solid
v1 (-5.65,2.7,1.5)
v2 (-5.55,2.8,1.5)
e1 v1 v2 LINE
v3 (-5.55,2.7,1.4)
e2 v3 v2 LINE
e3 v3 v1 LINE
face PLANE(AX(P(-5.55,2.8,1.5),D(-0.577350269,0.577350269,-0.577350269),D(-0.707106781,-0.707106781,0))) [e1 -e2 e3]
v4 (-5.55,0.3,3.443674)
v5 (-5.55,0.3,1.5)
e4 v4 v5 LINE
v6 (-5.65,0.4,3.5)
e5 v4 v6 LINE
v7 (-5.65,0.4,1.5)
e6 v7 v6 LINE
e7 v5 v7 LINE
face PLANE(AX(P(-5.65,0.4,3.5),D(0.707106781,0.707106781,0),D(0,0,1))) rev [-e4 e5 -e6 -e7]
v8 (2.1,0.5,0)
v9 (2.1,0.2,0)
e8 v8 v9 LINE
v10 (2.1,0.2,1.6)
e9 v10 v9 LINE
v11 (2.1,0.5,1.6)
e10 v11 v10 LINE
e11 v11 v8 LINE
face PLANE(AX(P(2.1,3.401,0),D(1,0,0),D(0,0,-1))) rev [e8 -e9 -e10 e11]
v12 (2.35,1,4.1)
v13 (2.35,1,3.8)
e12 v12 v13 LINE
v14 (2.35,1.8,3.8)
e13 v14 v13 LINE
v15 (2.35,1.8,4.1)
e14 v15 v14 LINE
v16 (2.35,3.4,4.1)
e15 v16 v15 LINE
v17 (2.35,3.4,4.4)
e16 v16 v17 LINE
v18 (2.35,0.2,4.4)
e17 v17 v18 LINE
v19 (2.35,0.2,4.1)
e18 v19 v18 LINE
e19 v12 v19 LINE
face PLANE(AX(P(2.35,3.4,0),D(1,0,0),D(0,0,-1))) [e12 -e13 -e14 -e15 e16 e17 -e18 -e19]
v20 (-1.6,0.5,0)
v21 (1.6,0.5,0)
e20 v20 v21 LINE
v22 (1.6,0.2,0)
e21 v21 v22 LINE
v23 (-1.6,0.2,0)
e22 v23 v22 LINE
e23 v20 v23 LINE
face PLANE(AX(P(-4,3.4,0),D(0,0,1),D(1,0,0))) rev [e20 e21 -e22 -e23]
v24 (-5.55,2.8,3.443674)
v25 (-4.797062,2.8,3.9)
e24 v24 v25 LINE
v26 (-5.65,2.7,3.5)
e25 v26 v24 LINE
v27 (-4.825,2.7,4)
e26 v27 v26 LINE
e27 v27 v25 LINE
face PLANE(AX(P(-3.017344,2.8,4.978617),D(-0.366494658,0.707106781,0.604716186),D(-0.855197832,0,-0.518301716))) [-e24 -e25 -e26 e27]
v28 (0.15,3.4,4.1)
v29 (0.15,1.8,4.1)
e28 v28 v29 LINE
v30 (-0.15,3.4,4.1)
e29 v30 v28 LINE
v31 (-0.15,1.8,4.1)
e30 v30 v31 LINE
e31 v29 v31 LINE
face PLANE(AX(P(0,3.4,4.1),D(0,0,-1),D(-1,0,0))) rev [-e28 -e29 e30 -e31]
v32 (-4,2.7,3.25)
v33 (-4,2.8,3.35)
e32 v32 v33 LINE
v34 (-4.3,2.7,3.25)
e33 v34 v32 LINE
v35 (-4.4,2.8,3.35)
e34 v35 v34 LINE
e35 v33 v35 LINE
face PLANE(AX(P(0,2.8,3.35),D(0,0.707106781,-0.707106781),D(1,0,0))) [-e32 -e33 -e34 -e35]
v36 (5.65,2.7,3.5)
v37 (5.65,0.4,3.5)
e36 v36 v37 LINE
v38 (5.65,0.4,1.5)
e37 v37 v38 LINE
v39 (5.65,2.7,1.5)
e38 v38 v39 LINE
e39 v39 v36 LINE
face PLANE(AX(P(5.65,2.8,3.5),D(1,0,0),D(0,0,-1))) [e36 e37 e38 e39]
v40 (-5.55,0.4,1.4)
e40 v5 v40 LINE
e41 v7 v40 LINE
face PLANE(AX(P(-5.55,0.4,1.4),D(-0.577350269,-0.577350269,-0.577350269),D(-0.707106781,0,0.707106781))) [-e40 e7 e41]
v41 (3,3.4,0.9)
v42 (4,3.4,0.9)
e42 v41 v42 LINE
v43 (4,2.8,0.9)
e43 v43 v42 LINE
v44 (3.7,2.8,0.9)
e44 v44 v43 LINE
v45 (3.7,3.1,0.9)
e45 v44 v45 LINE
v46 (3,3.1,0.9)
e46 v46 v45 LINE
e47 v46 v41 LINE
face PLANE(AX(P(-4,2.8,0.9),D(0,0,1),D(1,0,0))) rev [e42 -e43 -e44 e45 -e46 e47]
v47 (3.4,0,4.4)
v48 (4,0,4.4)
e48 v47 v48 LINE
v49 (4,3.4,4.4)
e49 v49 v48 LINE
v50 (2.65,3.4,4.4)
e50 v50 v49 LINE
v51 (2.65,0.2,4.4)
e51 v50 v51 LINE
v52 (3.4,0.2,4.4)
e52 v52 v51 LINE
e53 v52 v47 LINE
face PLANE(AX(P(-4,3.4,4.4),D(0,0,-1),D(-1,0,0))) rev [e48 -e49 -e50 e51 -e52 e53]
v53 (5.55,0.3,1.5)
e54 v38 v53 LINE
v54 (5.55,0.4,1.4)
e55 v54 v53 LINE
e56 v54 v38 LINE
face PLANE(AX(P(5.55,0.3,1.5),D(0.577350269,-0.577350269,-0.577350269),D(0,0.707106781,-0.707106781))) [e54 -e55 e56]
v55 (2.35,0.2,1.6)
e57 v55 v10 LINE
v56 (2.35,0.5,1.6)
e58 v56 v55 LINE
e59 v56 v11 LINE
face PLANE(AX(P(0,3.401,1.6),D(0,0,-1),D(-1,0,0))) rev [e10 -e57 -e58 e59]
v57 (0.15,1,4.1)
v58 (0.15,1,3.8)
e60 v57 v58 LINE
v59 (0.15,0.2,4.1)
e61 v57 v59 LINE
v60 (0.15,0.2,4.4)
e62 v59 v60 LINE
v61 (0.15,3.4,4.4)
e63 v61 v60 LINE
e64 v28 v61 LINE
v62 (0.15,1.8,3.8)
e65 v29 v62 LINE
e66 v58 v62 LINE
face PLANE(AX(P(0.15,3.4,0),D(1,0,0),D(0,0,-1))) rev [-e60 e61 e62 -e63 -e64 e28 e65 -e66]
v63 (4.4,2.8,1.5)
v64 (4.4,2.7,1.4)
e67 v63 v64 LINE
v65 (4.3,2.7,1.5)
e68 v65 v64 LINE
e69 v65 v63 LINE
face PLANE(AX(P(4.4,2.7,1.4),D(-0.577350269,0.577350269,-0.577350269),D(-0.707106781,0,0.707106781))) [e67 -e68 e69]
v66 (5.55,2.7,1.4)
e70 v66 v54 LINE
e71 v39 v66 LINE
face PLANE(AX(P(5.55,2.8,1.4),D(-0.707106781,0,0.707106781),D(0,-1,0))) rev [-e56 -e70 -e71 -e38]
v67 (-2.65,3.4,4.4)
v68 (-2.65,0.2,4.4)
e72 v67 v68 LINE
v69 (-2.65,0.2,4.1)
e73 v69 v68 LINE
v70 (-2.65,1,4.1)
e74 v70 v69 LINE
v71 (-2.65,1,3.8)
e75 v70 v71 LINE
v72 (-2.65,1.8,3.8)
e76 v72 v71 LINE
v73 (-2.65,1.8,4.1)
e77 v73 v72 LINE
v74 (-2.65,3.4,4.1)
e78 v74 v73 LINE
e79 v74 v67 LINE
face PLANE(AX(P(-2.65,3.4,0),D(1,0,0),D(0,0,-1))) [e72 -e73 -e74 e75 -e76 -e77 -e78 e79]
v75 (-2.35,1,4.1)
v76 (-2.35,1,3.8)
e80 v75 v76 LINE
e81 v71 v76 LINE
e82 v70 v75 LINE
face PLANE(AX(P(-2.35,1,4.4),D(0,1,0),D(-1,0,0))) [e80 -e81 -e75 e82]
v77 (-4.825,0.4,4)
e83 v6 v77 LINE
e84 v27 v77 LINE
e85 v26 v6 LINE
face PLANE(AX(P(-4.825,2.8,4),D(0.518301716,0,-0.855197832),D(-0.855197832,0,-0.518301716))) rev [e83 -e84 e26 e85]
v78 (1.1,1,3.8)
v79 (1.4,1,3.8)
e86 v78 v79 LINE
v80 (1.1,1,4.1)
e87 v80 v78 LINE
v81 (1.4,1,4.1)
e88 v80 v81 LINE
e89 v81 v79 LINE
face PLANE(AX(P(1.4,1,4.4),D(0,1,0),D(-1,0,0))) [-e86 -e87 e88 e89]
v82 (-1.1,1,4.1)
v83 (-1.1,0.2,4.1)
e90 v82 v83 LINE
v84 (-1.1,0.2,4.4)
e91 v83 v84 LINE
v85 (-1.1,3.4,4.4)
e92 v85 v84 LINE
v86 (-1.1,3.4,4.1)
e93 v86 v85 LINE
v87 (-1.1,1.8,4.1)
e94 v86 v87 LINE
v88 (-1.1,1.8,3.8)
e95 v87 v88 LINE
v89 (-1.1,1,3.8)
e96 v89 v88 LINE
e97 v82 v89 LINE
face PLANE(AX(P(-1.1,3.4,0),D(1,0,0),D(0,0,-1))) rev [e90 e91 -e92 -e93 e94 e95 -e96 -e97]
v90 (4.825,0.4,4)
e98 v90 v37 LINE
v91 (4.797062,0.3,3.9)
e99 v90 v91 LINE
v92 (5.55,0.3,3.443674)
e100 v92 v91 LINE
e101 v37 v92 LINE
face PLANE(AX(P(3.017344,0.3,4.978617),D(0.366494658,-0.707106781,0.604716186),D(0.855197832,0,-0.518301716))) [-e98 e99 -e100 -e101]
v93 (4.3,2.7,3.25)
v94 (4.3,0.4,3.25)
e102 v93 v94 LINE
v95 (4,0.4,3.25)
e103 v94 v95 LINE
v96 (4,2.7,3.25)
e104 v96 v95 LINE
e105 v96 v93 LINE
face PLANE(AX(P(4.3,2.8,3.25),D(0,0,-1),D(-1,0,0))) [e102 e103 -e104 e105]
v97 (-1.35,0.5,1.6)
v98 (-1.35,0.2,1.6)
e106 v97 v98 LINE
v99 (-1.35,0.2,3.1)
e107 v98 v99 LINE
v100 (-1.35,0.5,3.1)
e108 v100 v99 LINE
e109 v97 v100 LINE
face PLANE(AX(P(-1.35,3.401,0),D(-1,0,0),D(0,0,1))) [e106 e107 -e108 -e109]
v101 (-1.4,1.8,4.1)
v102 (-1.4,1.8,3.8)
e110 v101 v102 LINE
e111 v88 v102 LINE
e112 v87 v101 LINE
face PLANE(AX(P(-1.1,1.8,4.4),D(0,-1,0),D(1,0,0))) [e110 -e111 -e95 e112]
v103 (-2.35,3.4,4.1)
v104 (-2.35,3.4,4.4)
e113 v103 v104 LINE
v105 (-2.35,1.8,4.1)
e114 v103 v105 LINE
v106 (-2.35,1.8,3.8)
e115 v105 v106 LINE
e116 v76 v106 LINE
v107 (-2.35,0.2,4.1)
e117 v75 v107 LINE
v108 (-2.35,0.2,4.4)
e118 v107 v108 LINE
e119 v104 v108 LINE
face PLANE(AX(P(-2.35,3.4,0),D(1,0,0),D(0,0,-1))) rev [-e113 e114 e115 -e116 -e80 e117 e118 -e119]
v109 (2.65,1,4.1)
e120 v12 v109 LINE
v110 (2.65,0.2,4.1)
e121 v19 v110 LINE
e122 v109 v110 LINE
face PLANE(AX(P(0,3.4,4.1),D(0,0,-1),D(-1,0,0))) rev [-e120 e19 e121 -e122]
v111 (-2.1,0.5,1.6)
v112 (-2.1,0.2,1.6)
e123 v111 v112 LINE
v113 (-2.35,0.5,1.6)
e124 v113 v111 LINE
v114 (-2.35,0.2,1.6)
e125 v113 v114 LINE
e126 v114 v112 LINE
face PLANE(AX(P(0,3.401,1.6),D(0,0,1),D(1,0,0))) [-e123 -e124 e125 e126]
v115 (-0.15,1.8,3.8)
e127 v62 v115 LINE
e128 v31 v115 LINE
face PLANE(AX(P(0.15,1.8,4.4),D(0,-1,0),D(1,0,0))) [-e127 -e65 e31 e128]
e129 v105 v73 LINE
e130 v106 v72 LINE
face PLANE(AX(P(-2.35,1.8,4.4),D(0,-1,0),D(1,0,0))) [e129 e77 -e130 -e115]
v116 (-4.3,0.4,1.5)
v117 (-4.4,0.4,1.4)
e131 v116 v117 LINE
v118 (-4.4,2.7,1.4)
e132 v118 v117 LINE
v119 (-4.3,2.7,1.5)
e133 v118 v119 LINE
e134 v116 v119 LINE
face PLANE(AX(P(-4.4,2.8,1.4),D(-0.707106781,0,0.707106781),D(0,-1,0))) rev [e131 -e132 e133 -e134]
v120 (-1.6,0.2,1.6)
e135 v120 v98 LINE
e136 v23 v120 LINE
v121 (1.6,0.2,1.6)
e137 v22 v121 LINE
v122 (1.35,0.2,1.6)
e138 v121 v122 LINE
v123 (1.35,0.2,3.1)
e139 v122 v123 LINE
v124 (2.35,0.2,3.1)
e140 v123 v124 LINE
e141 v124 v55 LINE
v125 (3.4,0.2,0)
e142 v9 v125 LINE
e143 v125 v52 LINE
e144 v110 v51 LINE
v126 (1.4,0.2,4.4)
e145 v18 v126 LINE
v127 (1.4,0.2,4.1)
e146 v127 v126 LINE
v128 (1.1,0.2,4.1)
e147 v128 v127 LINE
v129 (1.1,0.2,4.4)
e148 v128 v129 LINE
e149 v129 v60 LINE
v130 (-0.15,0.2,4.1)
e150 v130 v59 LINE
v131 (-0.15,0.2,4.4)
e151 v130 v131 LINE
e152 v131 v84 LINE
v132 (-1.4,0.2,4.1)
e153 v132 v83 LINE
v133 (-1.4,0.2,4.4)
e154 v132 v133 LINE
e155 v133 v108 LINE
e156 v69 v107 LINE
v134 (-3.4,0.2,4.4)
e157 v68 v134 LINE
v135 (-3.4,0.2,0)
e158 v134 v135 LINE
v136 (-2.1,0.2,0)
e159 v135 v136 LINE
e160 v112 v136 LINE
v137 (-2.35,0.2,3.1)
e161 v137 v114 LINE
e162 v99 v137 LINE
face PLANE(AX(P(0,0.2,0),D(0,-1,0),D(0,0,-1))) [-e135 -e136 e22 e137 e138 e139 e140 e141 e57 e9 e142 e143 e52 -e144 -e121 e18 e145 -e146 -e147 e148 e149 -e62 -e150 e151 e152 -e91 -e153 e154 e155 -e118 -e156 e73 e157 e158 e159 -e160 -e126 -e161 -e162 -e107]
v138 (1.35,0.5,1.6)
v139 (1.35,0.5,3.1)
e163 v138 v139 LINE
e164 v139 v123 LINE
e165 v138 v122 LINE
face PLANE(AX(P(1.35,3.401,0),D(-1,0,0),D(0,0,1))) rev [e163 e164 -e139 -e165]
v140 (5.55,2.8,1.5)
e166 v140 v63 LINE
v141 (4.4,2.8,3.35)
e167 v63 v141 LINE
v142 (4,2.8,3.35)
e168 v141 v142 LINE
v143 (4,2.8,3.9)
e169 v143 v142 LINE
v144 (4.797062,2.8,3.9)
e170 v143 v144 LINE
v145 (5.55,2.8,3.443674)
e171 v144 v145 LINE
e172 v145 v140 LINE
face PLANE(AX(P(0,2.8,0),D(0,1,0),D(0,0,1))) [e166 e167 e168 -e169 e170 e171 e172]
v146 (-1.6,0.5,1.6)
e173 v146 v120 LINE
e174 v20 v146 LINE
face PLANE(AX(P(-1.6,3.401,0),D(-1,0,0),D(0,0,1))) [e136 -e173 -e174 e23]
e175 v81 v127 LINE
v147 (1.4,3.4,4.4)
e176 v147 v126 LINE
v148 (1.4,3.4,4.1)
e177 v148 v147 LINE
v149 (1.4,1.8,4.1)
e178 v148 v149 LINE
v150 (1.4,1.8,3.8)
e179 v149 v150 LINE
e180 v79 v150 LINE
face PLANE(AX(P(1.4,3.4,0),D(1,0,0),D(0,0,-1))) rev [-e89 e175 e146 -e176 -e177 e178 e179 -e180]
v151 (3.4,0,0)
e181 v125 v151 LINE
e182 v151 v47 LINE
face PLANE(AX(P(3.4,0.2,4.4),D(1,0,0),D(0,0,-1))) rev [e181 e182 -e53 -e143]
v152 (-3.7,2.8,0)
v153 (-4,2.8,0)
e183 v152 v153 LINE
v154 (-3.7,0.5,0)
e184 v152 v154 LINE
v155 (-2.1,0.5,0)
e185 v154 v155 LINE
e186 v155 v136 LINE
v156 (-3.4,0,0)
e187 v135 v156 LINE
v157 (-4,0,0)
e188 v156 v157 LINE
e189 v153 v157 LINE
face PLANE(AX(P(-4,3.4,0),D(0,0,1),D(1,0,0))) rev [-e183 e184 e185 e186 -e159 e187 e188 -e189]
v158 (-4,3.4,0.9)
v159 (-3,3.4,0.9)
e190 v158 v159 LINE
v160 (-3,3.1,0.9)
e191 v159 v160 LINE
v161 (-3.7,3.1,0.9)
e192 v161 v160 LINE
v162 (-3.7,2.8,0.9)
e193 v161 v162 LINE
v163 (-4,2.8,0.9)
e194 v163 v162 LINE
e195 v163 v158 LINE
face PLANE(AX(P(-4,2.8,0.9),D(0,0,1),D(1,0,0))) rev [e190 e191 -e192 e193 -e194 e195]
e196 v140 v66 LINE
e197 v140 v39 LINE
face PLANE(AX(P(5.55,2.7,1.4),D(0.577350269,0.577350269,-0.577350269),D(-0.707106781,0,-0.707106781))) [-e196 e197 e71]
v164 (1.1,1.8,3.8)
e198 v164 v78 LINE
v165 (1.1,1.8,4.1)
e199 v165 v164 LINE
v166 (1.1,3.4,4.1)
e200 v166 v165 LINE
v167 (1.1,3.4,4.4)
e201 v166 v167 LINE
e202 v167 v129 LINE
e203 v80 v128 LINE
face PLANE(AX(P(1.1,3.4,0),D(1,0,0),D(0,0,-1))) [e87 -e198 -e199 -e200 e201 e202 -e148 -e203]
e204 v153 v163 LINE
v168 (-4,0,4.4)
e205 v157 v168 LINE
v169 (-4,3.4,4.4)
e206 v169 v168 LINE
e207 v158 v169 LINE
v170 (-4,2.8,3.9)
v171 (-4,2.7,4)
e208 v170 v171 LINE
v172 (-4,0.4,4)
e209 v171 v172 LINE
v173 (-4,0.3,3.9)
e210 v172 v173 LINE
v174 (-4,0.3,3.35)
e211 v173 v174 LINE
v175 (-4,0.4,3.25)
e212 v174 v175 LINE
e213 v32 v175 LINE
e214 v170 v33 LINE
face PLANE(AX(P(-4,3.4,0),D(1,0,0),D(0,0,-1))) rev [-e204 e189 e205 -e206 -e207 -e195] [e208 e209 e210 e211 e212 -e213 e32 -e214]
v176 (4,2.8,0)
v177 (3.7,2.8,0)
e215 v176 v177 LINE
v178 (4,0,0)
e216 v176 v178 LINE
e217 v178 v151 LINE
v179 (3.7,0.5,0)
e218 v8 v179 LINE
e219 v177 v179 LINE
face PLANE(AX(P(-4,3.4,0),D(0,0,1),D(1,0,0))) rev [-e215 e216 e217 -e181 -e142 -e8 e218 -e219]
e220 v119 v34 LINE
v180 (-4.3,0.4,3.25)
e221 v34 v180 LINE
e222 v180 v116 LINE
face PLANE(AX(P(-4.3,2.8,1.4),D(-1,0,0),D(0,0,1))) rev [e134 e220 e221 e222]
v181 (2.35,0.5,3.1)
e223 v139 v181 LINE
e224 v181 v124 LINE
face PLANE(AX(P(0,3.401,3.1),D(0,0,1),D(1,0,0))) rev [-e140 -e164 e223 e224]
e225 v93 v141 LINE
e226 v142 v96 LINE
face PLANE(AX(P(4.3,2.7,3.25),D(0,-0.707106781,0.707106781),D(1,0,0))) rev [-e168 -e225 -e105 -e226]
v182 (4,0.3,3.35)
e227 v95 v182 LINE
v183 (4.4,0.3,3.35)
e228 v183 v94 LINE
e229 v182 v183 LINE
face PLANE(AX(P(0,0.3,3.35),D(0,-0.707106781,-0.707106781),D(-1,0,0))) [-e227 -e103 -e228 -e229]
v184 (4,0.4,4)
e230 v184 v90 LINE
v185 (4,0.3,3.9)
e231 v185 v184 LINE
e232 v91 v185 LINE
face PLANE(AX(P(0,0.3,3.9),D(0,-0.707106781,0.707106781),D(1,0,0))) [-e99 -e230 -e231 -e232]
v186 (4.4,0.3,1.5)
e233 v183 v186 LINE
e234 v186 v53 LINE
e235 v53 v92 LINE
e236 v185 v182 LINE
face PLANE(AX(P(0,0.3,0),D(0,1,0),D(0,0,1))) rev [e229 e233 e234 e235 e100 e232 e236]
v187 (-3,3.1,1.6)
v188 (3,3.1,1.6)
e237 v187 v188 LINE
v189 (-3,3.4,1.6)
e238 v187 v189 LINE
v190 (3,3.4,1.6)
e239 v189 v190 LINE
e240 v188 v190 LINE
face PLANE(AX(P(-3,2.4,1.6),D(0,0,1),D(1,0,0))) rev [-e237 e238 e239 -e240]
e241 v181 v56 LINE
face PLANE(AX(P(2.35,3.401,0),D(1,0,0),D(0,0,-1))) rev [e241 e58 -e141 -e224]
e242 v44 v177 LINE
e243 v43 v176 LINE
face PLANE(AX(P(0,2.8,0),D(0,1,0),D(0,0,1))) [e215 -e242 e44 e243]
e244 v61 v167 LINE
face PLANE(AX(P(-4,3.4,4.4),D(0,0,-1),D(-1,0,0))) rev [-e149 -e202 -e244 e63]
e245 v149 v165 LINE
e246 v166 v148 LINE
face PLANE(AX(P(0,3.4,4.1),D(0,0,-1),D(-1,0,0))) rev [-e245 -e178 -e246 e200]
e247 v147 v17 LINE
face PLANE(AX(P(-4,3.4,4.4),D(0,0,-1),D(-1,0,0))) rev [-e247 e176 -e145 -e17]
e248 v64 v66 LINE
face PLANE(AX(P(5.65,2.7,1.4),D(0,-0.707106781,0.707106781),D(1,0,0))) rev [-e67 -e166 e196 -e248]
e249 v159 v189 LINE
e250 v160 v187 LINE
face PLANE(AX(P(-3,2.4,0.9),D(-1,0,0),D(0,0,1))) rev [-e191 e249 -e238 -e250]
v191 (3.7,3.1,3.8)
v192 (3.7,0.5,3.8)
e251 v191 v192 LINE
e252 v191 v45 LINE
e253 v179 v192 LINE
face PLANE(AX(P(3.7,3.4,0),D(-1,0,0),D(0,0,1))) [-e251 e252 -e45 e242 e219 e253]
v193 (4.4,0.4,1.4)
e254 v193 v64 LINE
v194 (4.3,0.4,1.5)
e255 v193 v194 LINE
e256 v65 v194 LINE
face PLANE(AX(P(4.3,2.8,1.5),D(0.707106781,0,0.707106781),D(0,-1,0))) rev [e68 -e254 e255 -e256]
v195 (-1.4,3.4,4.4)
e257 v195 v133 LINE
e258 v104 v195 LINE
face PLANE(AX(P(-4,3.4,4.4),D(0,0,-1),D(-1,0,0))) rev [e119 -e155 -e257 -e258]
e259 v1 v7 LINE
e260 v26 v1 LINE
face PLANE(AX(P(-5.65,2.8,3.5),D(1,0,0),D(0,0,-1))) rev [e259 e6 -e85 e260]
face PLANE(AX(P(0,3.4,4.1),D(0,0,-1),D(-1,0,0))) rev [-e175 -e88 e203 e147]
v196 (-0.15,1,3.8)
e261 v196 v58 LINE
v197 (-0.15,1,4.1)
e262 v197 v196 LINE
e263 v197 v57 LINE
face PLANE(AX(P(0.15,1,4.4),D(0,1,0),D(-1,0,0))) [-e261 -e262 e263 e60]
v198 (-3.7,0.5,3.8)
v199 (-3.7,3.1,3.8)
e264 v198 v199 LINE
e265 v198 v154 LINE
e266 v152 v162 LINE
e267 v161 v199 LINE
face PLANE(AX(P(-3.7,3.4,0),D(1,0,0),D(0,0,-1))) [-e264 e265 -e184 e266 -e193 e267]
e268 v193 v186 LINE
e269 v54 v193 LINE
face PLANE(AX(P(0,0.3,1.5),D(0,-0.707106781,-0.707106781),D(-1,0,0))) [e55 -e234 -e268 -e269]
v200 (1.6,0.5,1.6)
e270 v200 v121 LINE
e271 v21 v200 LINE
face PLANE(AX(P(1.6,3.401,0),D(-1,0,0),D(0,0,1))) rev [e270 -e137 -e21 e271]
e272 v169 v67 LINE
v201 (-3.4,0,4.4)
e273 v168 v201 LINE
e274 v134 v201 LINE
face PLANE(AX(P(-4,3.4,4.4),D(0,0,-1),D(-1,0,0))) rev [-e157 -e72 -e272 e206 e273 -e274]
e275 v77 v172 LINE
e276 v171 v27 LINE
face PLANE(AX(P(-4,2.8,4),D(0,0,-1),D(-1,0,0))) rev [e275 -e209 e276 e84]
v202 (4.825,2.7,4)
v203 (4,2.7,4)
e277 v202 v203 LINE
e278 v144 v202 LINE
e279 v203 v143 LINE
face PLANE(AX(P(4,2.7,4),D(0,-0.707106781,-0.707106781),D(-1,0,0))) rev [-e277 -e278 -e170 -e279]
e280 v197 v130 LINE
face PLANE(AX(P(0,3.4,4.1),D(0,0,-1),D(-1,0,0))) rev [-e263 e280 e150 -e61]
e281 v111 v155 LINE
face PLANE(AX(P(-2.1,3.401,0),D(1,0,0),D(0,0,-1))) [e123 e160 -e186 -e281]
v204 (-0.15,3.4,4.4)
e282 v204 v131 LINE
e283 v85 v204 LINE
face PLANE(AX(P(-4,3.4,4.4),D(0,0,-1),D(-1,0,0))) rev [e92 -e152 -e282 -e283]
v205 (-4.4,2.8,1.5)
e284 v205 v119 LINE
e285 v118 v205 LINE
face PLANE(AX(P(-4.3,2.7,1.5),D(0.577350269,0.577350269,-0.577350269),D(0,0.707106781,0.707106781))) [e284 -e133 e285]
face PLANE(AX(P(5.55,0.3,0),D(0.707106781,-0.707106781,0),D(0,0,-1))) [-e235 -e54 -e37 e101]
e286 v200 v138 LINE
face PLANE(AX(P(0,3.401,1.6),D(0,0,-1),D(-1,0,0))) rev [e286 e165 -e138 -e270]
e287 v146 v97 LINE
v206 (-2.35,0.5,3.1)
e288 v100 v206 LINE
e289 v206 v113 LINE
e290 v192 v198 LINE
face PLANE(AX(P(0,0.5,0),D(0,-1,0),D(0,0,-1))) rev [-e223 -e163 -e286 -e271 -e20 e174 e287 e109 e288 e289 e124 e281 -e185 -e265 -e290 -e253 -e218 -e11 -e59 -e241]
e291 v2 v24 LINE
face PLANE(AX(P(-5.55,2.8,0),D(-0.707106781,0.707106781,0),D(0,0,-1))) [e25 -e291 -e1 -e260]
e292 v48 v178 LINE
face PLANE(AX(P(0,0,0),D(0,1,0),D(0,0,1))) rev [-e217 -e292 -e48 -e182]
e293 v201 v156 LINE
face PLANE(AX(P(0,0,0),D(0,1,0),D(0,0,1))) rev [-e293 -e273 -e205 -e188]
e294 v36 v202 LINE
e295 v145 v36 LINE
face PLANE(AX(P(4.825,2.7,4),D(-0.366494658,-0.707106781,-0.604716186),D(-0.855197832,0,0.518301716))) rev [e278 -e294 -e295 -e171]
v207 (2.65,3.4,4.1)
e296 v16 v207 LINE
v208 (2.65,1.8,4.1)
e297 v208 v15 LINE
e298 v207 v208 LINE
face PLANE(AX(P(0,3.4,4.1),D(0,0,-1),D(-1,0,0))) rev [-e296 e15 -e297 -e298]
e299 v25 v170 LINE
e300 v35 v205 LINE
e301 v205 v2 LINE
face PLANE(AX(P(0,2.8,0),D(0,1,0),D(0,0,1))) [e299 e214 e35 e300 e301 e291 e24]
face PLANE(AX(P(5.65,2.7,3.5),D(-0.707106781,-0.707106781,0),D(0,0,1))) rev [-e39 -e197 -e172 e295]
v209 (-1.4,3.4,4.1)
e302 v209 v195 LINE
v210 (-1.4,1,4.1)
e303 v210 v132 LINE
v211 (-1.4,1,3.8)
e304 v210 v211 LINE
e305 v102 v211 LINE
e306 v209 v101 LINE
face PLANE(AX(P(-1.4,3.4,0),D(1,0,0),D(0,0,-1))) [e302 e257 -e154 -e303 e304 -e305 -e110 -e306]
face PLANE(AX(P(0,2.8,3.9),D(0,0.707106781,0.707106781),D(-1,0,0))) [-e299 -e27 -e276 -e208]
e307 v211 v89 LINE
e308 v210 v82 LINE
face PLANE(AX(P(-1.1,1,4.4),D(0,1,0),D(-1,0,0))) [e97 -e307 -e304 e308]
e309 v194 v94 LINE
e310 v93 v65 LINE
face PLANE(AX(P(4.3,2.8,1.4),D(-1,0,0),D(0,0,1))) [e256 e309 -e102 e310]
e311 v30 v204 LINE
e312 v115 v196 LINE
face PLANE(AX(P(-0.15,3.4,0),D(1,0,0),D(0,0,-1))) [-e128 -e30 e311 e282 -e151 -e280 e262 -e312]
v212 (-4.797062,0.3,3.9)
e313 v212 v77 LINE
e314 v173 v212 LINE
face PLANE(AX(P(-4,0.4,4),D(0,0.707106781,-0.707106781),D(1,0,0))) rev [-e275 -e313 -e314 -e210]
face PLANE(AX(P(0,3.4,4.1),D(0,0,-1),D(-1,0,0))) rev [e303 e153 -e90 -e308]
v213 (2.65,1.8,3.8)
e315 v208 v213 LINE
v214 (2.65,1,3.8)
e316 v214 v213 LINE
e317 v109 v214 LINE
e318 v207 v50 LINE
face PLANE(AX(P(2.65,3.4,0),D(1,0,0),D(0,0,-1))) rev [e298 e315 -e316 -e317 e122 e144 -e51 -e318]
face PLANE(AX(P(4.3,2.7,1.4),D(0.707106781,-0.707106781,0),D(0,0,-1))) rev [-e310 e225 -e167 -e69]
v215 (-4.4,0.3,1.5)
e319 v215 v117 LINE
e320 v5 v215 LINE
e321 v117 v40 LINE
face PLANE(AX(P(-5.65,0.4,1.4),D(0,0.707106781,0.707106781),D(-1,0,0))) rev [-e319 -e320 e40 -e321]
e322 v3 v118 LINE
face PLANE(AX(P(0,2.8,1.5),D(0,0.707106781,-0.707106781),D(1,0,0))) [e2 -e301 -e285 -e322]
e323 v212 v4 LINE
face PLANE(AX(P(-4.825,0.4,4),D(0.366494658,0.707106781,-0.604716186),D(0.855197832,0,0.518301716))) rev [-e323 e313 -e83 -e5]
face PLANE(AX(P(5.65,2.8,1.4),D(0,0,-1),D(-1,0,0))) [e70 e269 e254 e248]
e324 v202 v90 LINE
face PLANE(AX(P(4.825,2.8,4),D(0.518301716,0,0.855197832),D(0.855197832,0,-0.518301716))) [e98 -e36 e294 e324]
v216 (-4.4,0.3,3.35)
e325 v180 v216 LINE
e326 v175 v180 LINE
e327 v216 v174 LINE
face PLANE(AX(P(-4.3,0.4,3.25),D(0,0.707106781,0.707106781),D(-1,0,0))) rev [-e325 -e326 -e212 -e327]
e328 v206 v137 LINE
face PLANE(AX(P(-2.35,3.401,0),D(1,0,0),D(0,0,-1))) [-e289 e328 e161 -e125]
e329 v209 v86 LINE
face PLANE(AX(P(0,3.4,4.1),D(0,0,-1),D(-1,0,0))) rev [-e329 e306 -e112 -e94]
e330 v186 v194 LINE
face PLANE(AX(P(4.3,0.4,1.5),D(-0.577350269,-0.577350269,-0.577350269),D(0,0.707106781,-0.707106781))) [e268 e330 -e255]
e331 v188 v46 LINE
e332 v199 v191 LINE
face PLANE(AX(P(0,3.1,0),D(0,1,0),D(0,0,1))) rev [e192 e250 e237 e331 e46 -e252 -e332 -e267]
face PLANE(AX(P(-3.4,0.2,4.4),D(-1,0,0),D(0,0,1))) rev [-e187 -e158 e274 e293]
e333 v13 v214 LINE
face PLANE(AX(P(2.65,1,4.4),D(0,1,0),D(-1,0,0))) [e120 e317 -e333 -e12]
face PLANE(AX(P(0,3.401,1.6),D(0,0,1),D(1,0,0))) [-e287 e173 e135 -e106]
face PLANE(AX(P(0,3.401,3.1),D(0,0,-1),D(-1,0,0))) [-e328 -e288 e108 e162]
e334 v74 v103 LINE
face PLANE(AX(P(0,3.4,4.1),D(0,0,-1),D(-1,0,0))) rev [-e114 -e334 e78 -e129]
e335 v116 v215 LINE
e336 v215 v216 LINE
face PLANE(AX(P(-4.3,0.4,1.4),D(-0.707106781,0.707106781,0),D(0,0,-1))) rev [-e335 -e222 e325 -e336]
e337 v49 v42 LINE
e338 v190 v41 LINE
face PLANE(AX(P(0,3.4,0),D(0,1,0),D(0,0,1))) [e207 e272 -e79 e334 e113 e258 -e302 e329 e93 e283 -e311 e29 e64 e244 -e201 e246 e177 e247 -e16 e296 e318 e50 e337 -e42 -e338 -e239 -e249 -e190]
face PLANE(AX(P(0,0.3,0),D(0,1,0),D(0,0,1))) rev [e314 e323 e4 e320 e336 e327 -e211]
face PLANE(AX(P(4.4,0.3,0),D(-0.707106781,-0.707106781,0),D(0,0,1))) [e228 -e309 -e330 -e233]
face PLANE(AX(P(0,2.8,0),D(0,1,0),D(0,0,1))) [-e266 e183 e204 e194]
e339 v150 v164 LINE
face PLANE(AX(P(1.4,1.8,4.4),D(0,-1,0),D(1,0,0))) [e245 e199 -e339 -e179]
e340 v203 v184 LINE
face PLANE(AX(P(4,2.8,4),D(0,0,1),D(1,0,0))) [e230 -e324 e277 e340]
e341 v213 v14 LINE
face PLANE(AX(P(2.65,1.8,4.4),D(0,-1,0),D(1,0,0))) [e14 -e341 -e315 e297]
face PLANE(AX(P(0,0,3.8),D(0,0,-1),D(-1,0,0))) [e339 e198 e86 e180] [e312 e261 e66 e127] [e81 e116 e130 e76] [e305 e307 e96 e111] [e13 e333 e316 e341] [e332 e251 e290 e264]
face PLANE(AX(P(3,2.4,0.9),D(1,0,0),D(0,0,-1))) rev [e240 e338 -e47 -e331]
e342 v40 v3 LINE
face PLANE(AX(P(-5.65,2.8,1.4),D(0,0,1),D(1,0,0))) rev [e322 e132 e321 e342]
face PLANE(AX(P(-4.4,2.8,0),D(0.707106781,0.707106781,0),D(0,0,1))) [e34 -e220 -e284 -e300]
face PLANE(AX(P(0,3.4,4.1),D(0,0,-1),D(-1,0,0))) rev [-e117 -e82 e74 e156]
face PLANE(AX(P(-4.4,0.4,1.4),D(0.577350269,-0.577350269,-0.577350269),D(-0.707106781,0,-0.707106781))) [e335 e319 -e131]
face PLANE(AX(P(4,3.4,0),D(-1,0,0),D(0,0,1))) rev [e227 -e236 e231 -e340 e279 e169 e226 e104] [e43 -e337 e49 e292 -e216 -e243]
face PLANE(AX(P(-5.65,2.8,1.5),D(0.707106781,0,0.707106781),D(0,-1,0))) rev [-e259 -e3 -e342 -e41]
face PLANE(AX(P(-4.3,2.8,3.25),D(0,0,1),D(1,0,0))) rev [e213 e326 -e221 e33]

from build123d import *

# Parameters (mm, degrees)
SKETCH1_W                = 8
SKETCH1_H                = 4.4
BOSS_EXTRUDE1_DEPTH      = 3.4
SKETCH4_W                = 6.8
SKETCH4_H                = 4.4
CUT_EXTRUDE1_DEPTH       = 0.2
SHELL1_START             = -3.7
SHELL1_OUTLINE_W         = 2.6
SHELL1_OUTLINE_H         = 4.1
SHELL1_DEPTH             = 7.4
CUT_EXTRUDE3_REACH       = 8.85
SKETCH8_W                = 7.4
SKETCH8_H                = 2.6
BOSS_EXTRUDE2_DEPTH      = 0.3
SKETCH3_3_W              = 0.3
SKETCH3_3_H              = 1.4
CUT_EXTRUDE4_DEPTH       = 7.849817516
SKETCH9_W                = 0.3
SKETCH9_H                = 0.8
CUT_EXTRUDE5_DEPTH       = 7.849817516
SKETCH10_W               = 8
SKETCH10_H               = 0.9
CUT_EXTRUDE6_DEPTH       = 0.6
SKETCH11_W               = 6
SKETCH11_H               = 0.7
CUT_EXTRUDE7_DEPTH       = 1
BOSS_EXTRUDE3_START      = -0.3
BOSS_EXTRUDE3_DEPTH      = 2.5
CHAMFER1_SIZE            = 0.1
CHAMFER1_OF_MIRROR2_SIZE = 0.1


# Read off the part's stored shape, not the designer's step: Shell1
with BuildPart() as part:
    # Sketch1 → Boss-Extrude1 (new body)
    with BuildSketch(Plane(origin=(0, 0, 0), x_dir=(1, 0, 0), z_dir=(0, 1, 0))):
        with Locations((0, -2.2)):
            Rectangle(SKETCH1_W, SKETCH1_H)
    extrude(amount=BOSS_EXTRUDE1_DEPTH)

    # Sketch4 → Cut-Extrude1 (cut)
    with BuildSketch(Plane.XZ):
        with Locations((0, 2.2)):
            Rectangle(SKETCH4_W, SKETCH4_H)
    extrude(amount=-CUT_EXTRUDE1_DEPTH, mode=Mode.SUBTRACT)

    # Shell1 outline → Shell1 (cut)
    with BuildSketch(Plane.YZ.offset(SHELL1_START)):
        with Locations((1.8, 2.05)):
            Rectangle(SHELL1_OUTLINE_W, SHELL1_OUTLINE_H)
    extrude(amount=SHELL1_DEPTH, mode=Mode.SUBTRACT)

    # Sketch3 → Cut-Extrude3 (cut, up to next)
    with BuildSketch(Plane(origin=(0, 0, 0), x_dir=(1, 0, 0), z_dir=(0, 1, 0)), mode=Mode.PRIVATE) as cut_extrude3_sk1:
        Polygon((-1.6, -1.6), (-1.6, 0), (-2.1, 0), (-2.1, -1.6), (-2.35, -1.6), (-2.35, -3.1), (-1.35, -3.1), (-1.35, -1.6), align=None)
    cut_extrude3_tool1 = extrude(cut_extrude3_sk1.sketch, amount=CUT_EXTRUDE3_REACH, mode=Mode.PRIVATE) & part.part
    cut_extrude3 = cut_extrude3_tool1.solids().sort_by_distance((-1.85, 0, 1.81087))[0]
    add(cut_extrude3, mode=Mode.SUBTRACT)

    # Mirror1: Cut-Extrude3 across plane
    add(cut_extrude3.mirror(Plane(origin=(0, 0, 0), x_dir=(0, 0, 1), z_dir=(1, 0, 0))), mode=Mode.SUBTRACT)

    # Sketch8 → Boss-Extrude2 (add)
    with BuildSketch(Plane(origin=(0, 0, 4.1), x_dir=(-1, 0, 0), z_dir=(0, 0, -1))):
        with Locations((0, 1.8)):
            Rectangle(SKETCH8_W, SKETCH8_H)
    extrude(amount=BOSS_EXTRUDE2_DEPTH)

    # Sketch3<3> → Cut-Extrude4 (cut, through all)
    with BuildSketch(Plane(origin=(0, 0, 0), x_dir=(1, 0, 0), z_dir=(0, 1, 0))):
        with Locations((-2.5, -4.8)):
            Rectangle(SKETCH3_3_W, SKETCH3_3_H)
        with Locations((-1.25, -4.8)):
            Rectangle(SKETCH3_3_W, SKETCH3_3_H)
        with Locations((0, -4.8)):
            Rectangle(SKETCH3_3_W, SKETCH3_3_H)
        with Locations((1.25, -4.8)):
            Rectangle(SKETCH3_3_W, SKETCH3_3_H)
        with Locations((2.5, -4.8)):
            Rectangle(SKETCH3_3_W, SKETCH3_3_H)
    extrude(amount=CUT_EXTRUDE4_DEPTH, mode=Mode.SUBTRACT)

    # Sketch9 → Cut-Extrude5 (cut, through all)
    with BuildSketch(Plane.XY):
        with Locations((-2.5, 1.4)):
            Rectangle(SKETCH9_W, SKETCH9_H)
        with Locations((-1.25, 1.4)):
            Rectangle(SKETCH9_W, SKETCH9_H)
        with Locations((0, 1.4)):
            Rectangle(SKETCH9_W, SKETCH9_H)
        with Locations((1.25, 1.4)):
            Rectangle(SKETCH9_W, SKETCH9_H)
        with Locations((2.5, 1.4)):
            Rectangle(SKETCH9_W, SKETCH9_H)
    extrude(amount=CUT_EXTRUDE5_DEPTH, mode=Mode.SUBTRACT)

    # Sketch10 → Cut-Extrude6 (cut)
    with BuildSketch(Plane(origin=(0, 3.4, 0), x_dir=(1, 0, 0), z_dir=(0, 1, 0))):
        with Locations((0, -0.45)):
            Rectangle(SKETCH10_W, SKETCH10_H)
    extrude(amount=-CUT_EXTRUDE6_DEPTH, mode=Mode.SUBTRACT)

    # Sketch11 → Cut-Extrude7 (cut)
    with BuildSketch(Plane(origin=(0, 3.4, 0), x_dir=(1, 0, 0), z_dir=(0, 1, 0))):
        with Locations((0, -1.25)):
            Rectangle(SKETCH11_W, SKETCH11_H)
    extrude(amount=-CUT_EXTRUDE7_DEPTH, mode=Mode.SUBTRACT)

    # Sketch12 → Boss-Extrude3 (add)
    with BuildSketch(Plane.XZ.offset(BOSS_EXTRUDE3_START)):
        Polygon((4, 4), (4.825, 4), (5.65, 3.5), (5.65, 1.4), (4.3, 1.4), (4.3, 3.25), (4, 3.25), align=None)
    boss_extrude3 = extrude(amount=-BOSS_EXTRUDE3_DEPTH)

    # Chamfer1
    chamfer1_edges = [part.edges().sort_by_distance(p)[0] for p in [
        (4.4125, 2.8, 4),
        (5.2375, 2.8, 3.75),
        (5.65, 2.8, 2.45),
        (4.975, 2.8, 1.4),
        (5.65, 1.55, 1.4),
        (4.3, 2.8, 2.325),
        (4.3, 1.55, 1.4),
        (4.15, 2.8, 3.25),
        (4.15, 0.3, 3.25),
        (4.3, 0.3, 2.325),
        (4.975, 0.3, 1.4),
        (5.65, 0.3, 2.45),
        (5.2375, 0.3, 3.75),
        (4.4125, 0.3, 4),
    ]]
    chamfer(chamfer1_edges, length=CHAMFER1_SIZE)

    # Mirror2: Boss-Extrude3 across plane
    add(boss_extrude3.mirror(Plane(origin=(0, 0, 0), x_dir=(0, 0, 1), z_dir=(1, 0, 0))))

    # Chamfer1 of Mirror2
    chamfer1_of_mirror2_edges = [part.edges().sort_by_distance(p)[0] for p in [
        (-4.4125, 2.8, 4),
        (-5.2375, 2.8, 3.75),
        (-5.65, 2.8, 2.45),
        (-4.975, 2.8, 1.4),
        (-5.65, 1.55, 1.4),
        (-4.3, 2.8, 2.325),
        (-4.3, 1.55, 1.4),
        (-4.15, 2.8, 3.25),
        (-4.15, 0.3, 3.25),
        (-4.3, 0.3, 2.325),
        (-4.975, 0.3, 1.4),
        (-5.65, 0.3, 2.45),
        (-5.2375, 0.3, 3.75),
        (-4.4125, 0.3, 4),
    ]]
    chamfer(chamfer1_of_mirror2_edges, length=CHAMFER1_OF_MIRROR2_SIZE)


solid = part.part
